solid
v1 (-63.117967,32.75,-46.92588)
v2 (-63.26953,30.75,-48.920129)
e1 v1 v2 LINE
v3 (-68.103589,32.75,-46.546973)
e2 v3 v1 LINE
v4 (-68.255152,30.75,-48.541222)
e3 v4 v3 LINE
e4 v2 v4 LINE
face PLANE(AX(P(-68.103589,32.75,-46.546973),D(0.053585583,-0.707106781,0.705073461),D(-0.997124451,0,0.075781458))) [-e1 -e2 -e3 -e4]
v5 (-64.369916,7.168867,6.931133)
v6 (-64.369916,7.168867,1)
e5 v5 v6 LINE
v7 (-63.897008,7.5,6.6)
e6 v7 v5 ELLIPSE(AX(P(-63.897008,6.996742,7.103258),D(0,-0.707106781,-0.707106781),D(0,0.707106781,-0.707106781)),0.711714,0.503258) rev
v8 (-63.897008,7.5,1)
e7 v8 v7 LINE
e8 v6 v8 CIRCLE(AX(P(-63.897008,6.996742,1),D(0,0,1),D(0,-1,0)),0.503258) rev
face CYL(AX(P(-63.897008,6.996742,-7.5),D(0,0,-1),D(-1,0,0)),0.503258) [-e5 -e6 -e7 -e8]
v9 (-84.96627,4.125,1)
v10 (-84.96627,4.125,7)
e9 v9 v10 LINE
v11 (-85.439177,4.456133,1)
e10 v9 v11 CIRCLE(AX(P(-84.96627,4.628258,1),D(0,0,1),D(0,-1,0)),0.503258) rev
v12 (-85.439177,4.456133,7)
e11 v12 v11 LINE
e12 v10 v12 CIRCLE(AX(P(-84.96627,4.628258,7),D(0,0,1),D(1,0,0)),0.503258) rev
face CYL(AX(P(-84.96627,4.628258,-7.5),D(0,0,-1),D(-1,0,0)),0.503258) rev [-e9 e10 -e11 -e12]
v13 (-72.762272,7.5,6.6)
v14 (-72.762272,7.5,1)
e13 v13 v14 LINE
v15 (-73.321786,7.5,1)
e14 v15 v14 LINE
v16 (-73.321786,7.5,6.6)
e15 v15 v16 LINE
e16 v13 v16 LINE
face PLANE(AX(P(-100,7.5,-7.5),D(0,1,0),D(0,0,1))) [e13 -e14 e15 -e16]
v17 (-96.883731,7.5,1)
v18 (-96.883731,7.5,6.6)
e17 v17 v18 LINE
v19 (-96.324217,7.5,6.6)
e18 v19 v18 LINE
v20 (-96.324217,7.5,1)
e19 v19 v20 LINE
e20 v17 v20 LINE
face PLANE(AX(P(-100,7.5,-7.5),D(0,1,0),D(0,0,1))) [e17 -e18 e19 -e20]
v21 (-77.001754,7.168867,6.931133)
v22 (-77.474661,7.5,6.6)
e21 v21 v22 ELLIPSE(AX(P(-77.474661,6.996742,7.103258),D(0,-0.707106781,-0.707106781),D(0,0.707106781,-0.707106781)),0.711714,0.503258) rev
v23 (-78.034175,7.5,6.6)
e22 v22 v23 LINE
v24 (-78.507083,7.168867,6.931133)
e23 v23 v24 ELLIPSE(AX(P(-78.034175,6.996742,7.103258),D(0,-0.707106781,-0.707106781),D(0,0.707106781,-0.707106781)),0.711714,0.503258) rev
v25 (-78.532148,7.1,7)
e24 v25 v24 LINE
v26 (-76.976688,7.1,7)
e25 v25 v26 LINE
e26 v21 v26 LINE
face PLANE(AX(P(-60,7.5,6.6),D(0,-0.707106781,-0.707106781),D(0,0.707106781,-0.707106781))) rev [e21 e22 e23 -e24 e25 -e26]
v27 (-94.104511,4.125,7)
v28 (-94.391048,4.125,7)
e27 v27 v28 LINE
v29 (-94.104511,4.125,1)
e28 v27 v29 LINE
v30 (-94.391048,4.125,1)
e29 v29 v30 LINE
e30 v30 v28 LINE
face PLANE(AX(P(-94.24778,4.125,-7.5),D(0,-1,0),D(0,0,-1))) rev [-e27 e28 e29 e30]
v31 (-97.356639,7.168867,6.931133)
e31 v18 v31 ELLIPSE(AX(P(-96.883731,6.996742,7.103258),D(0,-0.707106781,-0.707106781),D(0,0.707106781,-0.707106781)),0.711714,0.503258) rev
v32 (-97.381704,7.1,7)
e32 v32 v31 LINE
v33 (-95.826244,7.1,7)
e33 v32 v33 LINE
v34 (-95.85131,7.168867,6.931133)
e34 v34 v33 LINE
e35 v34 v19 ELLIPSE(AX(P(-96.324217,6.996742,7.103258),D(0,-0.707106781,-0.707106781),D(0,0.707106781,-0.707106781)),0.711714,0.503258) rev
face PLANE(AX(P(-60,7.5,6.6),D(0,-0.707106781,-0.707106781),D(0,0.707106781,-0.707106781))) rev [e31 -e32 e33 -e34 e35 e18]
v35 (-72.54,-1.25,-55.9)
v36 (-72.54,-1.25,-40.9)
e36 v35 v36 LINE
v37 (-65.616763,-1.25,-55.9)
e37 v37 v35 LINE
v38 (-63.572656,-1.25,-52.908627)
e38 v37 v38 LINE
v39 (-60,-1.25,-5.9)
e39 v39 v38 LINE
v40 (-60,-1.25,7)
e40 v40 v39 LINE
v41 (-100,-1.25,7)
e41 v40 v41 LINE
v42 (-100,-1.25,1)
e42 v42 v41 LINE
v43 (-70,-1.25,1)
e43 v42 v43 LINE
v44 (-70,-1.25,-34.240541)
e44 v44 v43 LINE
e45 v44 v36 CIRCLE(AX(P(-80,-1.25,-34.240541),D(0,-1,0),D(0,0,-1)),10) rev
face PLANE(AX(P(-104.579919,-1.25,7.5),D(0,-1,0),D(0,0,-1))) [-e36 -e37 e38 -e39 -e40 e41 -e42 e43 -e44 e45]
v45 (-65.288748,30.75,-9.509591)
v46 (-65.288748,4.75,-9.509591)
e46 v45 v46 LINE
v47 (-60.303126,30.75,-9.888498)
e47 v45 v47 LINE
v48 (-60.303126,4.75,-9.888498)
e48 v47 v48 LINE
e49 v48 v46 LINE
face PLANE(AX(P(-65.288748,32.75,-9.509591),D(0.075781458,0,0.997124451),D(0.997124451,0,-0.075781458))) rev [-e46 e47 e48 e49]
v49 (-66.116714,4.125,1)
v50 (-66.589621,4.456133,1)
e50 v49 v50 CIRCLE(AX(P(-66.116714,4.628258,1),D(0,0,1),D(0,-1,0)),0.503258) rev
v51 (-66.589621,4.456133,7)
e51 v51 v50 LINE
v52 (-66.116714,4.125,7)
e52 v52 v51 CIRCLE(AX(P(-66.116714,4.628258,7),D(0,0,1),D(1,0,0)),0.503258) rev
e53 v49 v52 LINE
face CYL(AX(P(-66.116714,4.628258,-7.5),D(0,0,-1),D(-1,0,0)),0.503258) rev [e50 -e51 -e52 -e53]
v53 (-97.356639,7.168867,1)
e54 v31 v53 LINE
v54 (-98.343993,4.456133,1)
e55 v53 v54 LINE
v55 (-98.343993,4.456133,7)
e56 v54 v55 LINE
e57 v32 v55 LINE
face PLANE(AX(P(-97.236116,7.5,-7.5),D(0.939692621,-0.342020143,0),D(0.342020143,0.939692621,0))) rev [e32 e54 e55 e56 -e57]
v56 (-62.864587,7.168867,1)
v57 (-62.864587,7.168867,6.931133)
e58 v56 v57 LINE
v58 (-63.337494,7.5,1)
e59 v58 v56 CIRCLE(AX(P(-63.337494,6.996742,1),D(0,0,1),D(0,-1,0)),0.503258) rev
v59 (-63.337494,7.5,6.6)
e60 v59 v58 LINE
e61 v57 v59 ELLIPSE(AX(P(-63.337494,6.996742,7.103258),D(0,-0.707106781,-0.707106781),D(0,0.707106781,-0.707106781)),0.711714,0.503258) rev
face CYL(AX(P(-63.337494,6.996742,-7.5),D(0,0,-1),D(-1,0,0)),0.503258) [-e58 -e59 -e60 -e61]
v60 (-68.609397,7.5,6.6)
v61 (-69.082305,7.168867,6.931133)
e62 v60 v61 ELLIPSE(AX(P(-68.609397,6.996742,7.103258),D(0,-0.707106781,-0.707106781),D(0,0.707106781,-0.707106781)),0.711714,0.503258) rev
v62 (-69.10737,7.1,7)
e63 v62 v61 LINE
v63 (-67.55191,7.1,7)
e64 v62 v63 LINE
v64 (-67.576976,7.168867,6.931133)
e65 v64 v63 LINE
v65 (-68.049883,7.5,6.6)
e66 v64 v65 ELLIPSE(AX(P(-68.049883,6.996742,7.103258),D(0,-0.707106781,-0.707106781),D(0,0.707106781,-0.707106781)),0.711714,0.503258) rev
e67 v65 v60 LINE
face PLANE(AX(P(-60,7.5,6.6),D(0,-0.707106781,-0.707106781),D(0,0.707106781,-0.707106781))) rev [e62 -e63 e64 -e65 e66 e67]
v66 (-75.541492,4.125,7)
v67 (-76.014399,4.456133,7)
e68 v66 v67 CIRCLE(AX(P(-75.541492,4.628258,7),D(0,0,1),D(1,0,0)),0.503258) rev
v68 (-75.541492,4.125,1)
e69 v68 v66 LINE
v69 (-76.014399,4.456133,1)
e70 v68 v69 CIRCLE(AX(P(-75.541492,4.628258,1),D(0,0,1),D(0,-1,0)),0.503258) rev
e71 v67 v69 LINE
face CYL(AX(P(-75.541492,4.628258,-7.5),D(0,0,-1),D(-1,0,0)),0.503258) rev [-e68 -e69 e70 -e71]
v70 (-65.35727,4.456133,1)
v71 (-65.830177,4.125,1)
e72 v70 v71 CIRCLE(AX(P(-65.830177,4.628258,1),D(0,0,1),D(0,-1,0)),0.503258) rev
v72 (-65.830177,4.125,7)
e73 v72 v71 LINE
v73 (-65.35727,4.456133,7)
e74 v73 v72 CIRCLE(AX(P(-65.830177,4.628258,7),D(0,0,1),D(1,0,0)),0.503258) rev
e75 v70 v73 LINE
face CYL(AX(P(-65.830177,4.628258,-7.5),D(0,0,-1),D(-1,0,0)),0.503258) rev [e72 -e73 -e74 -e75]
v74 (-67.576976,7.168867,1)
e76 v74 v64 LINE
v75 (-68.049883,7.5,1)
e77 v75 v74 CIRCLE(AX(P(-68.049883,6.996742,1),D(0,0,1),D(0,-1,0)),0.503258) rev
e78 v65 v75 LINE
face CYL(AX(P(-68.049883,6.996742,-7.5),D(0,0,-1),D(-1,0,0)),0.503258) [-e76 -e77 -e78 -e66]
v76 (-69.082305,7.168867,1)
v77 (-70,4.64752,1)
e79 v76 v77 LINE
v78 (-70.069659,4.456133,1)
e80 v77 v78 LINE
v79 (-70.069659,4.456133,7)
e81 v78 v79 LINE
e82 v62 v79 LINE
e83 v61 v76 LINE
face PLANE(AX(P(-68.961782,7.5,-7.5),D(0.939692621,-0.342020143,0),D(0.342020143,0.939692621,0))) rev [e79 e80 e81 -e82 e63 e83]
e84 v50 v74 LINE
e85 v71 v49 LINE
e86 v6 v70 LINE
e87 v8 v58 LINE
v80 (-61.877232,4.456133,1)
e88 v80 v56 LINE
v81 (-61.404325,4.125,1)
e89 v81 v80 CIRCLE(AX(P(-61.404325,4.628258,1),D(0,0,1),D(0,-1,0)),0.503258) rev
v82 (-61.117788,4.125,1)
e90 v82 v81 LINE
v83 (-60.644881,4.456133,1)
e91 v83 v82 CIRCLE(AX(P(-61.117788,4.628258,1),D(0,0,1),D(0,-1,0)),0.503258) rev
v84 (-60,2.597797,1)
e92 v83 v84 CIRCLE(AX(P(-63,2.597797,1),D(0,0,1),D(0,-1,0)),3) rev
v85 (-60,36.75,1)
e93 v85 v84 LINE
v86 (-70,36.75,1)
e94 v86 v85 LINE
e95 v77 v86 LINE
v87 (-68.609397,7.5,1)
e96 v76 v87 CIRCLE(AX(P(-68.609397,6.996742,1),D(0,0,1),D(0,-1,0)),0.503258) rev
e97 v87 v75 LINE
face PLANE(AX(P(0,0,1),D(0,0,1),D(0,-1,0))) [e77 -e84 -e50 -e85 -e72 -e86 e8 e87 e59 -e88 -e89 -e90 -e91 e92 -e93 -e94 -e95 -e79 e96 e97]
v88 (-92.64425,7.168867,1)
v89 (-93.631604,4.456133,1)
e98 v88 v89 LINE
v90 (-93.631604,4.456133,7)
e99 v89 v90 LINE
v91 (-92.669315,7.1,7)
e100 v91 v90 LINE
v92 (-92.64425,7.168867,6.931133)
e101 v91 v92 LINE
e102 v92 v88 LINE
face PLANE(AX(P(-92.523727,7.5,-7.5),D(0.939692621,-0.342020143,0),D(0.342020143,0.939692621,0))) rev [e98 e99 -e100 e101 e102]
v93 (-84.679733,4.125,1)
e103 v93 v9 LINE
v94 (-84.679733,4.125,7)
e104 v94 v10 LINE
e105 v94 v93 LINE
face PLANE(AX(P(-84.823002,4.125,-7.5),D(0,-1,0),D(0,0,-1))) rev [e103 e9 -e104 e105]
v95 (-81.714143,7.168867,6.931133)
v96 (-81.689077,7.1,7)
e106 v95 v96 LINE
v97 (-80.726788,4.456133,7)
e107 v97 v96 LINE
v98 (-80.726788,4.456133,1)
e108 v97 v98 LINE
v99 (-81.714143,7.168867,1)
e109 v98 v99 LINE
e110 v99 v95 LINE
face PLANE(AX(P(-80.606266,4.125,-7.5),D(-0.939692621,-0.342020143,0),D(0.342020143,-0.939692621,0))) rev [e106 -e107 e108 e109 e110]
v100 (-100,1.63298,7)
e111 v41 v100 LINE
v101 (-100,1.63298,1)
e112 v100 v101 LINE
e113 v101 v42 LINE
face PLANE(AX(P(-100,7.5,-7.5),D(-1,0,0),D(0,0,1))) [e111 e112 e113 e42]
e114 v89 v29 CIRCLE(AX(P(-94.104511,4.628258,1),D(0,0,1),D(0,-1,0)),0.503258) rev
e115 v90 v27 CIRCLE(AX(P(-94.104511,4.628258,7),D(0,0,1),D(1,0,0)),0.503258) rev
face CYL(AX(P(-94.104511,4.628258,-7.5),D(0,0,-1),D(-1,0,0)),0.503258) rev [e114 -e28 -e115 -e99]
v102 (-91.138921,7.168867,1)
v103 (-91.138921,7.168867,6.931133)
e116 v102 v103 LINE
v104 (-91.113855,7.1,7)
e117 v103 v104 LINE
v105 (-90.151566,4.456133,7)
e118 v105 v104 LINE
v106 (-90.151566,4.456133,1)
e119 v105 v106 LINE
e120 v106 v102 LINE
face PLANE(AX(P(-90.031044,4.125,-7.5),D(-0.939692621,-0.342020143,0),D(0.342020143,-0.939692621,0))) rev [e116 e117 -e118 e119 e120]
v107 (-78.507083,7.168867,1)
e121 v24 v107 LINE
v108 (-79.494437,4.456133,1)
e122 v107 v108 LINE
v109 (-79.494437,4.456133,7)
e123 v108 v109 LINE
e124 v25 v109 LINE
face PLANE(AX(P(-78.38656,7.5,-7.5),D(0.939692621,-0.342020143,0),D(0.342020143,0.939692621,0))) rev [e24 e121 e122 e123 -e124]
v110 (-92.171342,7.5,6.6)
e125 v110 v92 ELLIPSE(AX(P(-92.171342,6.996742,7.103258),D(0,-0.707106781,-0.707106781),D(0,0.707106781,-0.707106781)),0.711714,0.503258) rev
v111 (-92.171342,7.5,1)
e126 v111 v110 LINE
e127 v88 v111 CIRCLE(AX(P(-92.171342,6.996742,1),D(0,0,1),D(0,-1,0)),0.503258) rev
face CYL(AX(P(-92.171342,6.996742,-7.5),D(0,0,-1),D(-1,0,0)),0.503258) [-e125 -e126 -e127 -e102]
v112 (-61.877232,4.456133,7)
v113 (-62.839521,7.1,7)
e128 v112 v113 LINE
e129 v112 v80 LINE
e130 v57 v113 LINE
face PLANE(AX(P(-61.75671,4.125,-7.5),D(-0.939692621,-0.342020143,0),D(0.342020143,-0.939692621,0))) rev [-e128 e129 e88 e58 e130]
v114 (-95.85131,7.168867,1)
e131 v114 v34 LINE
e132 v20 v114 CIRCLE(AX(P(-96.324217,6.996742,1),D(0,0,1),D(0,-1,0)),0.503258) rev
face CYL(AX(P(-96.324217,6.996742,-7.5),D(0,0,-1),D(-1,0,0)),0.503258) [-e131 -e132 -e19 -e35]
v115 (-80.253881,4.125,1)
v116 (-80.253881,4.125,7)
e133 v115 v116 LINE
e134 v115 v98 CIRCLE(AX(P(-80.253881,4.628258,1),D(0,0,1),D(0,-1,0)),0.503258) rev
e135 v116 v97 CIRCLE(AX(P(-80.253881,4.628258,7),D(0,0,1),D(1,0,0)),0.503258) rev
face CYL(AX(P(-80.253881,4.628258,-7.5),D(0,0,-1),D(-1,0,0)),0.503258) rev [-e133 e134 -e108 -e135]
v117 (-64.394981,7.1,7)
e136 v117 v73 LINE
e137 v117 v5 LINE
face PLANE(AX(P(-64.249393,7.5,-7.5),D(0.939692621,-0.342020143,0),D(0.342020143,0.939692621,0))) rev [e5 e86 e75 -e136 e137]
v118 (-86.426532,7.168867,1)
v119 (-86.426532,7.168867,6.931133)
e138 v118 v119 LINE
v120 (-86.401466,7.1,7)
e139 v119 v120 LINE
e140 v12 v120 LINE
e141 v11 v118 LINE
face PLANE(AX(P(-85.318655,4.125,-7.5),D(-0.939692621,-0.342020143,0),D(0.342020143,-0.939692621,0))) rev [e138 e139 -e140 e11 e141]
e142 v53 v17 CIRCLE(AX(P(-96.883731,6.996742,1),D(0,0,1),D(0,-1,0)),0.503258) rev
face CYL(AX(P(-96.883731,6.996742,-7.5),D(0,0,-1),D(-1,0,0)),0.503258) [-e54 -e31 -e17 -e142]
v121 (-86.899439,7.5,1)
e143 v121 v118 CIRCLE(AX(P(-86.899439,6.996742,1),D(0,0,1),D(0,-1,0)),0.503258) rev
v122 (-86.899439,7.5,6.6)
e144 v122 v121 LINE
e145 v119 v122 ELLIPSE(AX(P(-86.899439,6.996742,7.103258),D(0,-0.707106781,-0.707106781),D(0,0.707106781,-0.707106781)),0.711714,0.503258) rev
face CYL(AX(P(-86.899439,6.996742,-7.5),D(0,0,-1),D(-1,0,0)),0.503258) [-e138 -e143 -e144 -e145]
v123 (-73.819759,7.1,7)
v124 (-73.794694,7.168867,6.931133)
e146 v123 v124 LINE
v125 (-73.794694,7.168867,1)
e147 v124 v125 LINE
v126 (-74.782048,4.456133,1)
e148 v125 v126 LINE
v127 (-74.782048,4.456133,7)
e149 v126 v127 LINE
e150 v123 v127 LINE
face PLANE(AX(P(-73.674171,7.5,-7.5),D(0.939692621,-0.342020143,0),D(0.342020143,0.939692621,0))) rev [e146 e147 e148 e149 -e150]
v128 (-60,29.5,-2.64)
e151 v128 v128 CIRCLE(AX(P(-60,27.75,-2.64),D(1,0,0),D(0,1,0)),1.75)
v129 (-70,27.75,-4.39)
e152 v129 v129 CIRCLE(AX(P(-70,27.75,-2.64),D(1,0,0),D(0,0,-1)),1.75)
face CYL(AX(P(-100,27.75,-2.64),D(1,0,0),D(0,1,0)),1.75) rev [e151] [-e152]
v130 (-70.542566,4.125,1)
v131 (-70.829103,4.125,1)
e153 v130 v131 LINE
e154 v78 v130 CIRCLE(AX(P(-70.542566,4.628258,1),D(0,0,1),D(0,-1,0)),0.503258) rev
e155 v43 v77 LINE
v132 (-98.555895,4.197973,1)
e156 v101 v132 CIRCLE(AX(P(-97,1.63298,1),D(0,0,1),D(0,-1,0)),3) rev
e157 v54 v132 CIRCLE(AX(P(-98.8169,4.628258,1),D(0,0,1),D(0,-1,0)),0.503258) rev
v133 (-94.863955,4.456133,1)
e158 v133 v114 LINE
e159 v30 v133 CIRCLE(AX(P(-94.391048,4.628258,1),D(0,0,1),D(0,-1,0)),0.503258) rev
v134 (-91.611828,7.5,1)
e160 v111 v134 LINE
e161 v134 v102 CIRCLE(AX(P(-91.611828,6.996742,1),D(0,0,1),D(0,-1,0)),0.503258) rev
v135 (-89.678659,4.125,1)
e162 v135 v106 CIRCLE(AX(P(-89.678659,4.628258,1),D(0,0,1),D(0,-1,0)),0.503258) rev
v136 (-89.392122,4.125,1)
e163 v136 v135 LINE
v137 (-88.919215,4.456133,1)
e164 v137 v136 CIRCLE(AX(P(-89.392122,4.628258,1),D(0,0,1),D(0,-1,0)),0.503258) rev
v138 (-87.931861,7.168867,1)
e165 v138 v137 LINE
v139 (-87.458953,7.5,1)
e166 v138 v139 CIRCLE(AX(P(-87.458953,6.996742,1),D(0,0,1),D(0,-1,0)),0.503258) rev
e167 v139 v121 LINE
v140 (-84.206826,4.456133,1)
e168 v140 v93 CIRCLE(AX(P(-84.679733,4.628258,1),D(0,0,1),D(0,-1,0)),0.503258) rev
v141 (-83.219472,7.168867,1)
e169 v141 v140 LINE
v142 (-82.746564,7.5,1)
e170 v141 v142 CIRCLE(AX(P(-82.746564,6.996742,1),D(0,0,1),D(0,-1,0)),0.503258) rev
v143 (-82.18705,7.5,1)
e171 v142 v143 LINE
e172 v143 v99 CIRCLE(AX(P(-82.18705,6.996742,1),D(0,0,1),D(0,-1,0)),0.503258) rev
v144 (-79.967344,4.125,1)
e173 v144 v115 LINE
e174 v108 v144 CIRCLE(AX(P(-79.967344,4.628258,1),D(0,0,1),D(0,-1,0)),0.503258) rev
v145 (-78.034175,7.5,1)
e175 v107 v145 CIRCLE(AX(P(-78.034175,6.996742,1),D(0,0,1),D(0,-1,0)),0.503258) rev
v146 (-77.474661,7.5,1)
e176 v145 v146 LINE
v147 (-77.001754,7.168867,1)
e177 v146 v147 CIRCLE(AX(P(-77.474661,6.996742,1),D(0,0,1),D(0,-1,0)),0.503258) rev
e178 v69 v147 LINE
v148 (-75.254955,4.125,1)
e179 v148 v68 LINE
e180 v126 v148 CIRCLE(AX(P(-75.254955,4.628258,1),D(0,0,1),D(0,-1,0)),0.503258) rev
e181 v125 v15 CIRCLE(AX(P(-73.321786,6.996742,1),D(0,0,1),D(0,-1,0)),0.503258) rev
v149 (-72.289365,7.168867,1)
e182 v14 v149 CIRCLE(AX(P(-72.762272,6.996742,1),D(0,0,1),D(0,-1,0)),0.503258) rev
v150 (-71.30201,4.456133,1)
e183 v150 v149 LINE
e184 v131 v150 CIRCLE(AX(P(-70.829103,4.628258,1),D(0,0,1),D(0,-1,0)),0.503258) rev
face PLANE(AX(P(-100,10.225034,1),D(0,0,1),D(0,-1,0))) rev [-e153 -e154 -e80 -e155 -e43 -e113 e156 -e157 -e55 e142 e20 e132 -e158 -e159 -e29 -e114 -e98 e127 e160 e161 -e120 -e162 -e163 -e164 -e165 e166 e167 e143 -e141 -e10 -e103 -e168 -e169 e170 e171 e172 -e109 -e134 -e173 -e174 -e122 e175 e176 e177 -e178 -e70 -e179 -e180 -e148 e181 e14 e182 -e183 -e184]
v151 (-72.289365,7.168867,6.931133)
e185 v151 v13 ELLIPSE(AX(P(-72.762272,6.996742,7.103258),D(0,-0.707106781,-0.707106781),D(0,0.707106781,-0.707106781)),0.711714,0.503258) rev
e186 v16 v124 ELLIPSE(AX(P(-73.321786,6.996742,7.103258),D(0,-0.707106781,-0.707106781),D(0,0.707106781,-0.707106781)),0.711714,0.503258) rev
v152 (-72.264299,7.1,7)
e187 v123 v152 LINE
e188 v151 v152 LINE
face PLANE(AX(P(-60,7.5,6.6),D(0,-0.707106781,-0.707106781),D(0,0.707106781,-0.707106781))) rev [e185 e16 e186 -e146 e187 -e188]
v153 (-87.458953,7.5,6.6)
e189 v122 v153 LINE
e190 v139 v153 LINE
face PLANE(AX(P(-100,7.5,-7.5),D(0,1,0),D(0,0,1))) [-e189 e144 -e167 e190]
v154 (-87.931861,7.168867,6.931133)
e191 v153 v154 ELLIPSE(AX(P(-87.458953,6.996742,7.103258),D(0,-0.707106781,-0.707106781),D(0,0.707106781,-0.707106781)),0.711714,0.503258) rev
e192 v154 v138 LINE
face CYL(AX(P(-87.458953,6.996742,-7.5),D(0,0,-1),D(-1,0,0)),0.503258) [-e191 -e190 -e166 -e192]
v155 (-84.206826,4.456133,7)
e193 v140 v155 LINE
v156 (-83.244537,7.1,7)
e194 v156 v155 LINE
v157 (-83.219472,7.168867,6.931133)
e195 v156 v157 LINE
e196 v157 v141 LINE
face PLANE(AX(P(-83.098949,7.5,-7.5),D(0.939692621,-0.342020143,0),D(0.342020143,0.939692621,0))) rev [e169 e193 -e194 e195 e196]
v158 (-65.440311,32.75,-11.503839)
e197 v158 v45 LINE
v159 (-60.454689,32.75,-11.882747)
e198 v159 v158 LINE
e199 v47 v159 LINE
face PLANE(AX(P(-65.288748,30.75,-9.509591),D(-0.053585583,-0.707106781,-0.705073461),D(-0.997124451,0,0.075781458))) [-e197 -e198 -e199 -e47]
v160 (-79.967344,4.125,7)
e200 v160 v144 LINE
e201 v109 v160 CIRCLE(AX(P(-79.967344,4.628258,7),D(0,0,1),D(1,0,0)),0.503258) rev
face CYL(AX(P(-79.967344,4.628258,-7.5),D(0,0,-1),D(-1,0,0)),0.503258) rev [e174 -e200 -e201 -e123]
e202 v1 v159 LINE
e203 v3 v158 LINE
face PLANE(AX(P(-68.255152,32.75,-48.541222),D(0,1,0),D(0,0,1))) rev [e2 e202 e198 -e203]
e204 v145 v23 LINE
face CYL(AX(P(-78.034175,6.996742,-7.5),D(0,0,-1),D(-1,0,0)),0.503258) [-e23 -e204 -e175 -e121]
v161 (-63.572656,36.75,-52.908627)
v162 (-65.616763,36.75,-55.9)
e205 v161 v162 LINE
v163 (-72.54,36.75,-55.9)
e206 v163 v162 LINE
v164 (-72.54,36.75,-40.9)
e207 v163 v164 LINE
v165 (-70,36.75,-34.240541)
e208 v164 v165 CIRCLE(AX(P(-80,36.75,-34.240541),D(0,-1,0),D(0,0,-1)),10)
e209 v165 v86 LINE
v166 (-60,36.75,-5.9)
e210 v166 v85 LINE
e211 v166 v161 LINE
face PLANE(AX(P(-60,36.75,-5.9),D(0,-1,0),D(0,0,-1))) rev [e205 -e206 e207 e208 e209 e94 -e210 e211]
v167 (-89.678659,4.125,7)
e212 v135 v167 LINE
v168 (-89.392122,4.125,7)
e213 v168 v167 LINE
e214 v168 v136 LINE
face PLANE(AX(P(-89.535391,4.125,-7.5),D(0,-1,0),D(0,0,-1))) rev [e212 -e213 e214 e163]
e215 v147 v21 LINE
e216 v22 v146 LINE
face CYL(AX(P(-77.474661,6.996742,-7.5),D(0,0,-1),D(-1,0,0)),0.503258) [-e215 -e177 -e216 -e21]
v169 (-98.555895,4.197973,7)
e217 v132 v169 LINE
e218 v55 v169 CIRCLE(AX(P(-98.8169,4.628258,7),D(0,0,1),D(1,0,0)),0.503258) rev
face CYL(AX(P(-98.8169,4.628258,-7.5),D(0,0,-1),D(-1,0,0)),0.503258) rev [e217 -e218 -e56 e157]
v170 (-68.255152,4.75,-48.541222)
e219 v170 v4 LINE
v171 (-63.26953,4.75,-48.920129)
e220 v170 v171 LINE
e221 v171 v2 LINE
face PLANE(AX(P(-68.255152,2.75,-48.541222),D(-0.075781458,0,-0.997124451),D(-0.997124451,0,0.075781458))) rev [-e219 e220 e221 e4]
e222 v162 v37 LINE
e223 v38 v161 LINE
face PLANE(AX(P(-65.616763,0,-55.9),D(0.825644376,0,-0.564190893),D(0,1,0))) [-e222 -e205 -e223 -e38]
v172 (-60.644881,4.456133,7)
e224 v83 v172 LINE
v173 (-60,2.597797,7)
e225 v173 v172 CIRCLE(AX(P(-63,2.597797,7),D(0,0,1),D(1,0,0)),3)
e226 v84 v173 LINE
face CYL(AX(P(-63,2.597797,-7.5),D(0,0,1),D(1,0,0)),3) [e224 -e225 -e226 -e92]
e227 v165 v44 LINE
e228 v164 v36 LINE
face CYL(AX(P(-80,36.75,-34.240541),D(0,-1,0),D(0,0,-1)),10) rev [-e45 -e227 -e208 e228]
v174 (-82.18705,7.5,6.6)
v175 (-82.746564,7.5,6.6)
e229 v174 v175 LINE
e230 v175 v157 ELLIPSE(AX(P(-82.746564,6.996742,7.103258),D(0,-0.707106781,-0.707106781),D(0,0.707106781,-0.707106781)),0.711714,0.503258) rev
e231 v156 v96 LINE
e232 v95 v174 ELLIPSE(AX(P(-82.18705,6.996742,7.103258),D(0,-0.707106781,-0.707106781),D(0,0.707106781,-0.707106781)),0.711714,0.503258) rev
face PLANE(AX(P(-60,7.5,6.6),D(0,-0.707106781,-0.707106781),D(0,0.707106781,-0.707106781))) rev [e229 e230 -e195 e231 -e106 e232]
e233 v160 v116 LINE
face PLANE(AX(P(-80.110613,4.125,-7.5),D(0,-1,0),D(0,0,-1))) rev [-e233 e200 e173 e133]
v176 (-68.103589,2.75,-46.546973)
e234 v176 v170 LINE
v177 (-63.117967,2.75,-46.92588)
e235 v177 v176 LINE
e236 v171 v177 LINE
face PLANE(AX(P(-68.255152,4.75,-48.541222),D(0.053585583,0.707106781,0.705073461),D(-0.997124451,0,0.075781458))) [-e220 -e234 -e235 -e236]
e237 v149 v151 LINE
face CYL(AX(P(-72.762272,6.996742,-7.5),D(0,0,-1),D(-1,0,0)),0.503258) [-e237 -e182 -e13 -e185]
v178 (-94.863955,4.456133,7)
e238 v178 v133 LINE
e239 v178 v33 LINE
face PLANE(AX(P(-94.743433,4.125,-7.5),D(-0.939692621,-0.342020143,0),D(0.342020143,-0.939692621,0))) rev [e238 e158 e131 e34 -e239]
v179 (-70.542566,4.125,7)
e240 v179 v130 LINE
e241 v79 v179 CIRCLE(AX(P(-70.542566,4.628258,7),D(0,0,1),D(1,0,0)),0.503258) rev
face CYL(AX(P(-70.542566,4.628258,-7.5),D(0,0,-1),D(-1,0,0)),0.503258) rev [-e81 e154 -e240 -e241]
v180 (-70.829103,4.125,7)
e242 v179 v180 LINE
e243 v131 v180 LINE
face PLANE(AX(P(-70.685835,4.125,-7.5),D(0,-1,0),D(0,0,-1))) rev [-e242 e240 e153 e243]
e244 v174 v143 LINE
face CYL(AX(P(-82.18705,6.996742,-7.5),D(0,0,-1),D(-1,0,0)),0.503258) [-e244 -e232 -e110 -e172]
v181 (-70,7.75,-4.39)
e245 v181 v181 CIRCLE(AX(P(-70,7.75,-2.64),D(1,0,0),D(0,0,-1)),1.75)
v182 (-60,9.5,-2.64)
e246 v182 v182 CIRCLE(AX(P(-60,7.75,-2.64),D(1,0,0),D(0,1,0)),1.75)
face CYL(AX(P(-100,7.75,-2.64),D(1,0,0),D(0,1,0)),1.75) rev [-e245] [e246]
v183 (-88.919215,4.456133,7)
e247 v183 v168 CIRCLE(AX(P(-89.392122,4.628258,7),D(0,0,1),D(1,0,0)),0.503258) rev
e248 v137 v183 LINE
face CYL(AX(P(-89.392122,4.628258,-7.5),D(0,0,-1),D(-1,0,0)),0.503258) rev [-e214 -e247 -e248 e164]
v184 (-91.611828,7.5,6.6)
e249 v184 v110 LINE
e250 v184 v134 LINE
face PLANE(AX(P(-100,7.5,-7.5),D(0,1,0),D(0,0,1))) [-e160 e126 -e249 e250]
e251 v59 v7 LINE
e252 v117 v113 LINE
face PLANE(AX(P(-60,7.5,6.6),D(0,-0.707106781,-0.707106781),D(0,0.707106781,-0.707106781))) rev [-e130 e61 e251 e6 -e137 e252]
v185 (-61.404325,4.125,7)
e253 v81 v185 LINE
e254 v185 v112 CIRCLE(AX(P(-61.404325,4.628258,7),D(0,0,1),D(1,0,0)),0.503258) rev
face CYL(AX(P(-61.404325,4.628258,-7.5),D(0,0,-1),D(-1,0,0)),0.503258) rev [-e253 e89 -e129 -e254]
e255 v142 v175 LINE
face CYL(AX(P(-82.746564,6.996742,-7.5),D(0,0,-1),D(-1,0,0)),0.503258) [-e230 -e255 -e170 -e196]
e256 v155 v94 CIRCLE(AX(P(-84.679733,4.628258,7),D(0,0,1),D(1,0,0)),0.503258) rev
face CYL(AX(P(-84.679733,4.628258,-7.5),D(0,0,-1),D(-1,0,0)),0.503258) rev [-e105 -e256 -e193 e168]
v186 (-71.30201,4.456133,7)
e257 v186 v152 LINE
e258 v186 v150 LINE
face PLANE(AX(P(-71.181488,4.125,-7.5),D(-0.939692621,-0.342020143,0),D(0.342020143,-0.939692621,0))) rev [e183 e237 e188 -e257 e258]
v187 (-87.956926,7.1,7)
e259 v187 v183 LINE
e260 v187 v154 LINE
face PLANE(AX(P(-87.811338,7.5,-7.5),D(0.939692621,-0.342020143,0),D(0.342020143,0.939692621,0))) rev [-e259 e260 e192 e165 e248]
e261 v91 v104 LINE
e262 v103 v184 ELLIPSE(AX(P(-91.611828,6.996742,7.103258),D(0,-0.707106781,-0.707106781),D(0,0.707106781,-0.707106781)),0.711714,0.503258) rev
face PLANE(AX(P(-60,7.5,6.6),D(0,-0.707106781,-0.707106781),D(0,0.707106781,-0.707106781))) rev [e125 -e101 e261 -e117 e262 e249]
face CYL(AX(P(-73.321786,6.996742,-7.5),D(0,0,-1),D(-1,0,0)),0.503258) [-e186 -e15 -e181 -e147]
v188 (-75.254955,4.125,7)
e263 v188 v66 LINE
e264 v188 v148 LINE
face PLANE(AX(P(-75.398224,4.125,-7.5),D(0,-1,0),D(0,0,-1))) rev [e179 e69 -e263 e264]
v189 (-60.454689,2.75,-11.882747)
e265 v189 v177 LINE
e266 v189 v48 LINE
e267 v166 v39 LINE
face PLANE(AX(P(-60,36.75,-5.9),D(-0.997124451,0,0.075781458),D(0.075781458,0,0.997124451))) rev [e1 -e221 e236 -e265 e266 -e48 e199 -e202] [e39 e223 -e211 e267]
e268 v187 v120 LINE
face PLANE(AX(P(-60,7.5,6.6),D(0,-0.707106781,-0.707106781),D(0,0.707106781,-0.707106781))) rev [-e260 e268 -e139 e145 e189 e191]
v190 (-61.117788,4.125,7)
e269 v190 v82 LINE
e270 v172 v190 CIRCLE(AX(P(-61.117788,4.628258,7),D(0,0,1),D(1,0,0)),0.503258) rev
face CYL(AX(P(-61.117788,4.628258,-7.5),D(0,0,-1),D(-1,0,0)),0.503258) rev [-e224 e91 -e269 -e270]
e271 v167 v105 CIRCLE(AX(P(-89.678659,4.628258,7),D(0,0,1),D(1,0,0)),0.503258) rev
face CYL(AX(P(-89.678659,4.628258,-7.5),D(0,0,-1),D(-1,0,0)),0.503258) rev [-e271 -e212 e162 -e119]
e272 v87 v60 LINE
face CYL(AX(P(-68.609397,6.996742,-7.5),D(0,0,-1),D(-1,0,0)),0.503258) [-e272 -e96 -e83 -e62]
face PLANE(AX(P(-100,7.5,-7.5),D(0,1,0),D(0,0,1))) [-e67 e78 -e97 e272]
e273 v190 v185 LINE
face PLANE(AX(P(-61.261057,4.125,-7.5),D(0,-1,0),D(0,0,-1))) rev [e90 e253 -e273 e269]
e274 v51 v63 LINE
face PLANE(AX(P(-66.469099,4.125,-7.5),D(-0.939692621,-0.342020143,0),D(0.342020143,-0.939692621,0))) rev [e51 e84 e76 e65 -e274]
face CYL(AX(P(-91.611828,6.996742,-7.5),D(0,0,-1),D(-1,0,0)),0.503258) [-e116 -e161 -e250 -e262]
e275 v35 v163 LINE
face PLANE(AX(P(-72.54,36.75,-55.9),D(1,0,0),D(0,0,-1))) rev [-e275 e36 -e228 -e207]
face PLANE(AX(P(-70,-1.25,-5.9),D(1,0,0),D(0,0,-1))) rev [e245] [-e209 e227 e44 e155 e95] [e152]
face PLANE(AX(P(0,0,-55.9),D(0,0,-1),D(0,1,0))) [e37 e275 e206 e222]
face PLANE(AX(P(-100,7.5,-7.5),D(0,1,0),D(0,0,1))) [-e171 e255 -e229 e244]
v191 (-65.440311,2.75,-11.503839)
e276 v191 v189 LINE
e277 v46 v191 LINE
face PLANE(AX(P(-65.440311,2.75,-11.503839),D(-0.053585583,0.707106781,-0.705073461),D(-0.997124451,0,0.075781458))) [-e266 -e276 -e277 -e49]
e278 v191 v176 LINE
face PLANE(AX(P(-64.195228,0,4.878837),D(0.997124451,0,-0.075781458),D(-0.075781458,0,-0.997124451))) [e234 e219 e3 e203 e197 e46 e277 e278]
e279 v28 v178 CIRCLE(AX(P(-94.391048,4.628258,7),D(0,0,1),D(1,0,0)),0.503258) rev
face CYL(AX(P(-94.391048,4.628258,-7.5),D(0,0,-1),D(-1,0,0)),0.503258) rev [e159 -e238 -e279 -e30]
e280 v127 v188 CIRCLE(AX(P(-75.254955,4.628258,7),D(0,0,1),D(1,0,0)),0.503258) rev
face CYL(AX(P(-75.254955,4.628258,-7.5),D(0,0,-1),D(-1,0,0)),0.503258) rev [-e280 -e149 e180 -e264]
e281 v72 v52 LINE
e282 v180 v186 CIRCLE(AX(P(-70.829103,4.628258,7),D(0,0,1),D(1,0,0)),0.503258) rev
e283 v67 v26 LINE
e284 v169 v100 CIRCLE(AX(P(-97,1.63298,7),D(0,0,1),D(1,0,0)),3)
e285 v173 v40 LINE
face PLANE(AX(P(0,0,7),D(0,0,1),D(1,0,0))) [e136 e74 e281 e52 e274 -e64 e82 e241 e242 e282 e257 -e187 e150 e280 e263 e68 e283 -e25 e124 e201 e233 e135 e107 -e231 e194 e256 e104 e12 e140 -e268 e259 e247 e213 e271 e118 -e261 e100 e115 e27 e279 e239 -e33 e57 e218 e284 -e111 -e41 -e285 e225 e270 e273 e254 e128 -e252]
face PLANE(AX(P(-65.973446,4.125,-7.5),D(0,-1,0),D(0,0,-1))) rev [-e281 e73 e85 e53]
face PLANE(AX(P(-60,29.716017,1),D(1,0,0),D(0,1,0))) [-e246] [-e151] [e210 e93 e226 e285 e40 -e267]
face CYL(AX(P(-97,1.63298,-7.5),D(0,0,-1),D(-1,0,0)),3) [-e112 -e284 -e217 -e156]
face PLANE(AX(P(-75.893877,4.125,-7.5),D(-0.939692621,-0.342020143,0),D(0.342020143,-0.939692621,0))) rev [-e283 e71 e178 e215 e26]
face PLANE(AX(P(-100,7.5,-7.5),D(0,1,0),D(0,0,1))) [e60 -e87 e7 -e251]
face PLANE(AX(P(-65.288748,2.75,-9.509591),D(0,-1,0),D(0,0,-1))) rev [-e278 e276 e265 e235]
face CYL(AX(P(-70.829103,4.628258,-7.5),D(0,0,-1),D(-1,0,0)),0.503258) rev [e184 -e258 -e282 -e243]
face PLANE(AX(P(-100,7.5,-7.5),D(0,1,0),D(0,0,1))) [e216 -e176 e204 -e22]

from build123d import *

# Parameters (mm, degrees)
BOSS_EXTRUDE1_DEPTH      = 7.5
BOSS_EXTRUDE1_DEPTH_BACK = 7.5
SKETCH3_W                = 200
SKETCH3_H                = 15
CUT_EXTRUDE1_DEPTH       = 101.560926806
FILLET1_R                = 0.503257554
LPATTERN1_COUNT          = 42
LPATTERN1_PITCH          = 4.71238898
FILLET1_OF_LPATTERN1_R   = 0.503257554
CUT_EXTRUDE2_DEPTH       = 101.560926806
CUT_EXTRUDE2_DEPTH_BACK  = 101.560926806
SKETCH5_W                = 4.71238898
SKETCH5_H                = 3.375
CUT_EXTRUDE3_DEPTH       = 101.560926806
CUT_EXTRUDE3_DEPTH_BACK  = 101.560926806
SKETCH6_W                = 13.890612777
SKETCH6_H                = 21.950597968
CUT_EXTRUDE6_DEPTH       = 101.560926806
CUT_EXTRUDE6_DEPTH_BACK  = 101.560926806
SKETCH8_W                = 175.100830171
SKETCH8_H                = 44.946806771
SKETCH9_W                = 55.501850732
SKETCH9_H                = 10.784038355
CUT_EXTRUDE7_DEPTH       = 101.560926806
SKETCH10_W               = 10
SKETCH10_H               = 38
BOSS_EXTRUDE2_DEPTH      = 6.9
SKETCH11_W               = 12.54
SKETCH11_H               = 38
BOSS_EXTRUDE3_DEPTH      = 50
SKETCH12_W               = 2.54
SKETCH12_H               = 35
CUT_EXTRUDE8_DEPTH       = 121.701325593
CHAMFER1_SIZE            = 3
CHAMFER1_SIZE2           = 1.816762814
FILLET2_R                = 10
SKETCH13_W               = 39.144192087
SKETCH13_H               = 30
CUT_EXTRUDE9_DEPTH       = 5
CHAMFER2_SIZE            = 2
SKETCH14_R               = 1.75
CUT_EXTRUDE10_DEPTH      = 78.944675893
SKETCH15_W               = 75.463673411
SKETCH15_H               = 29.481435093
CUT_EXTRUDE11_DEPTH      = 0.5
FILLET3_R                = 3
CUT_EXTRUDE12_DEPTH      = 78.944675893
CUT_EXTRUDE12_DEPTH_BACK = 78.944675893


with BuildPart() as part:
    # Sketch3 → Boss-Extrude1 (new, two sides: drawn at the far end of the back side and taken through both)
    with BuildSketch(Plane.XY.offset(-BOSS_EXTRUDE1_DEPTH_BACK)):
        Rectangle(SKETCH3_W, SKETCH3_H)
    extrude(amount=BOSS_EXTRUDE1_DEPTH + BOSS_EXTRUDE1_DEPTH_BACK)

    # Sketch4 → Cut-Extrude1 (cut, symmetric)
    with BuildSketch(Plane.XY):
        Polygon((-94.247779608, 7.5), (-94.247779608, 4.125), (-94.743432664, 4.125), (-95.971832204, 7.5), align=None)
        Polygon((-97.236115992, 7.5), (-98.464515532, 4.125), (-98.960168588, 4.125), (-98.960168588, 7.5), align=None)
    cut_extrude1 = extrude(amount=CUT_EXTRUDE1_DEPTH, both=True, mode=Mode.SUBTRACT)

    # Fillet1
    fillet1_edges = [part.edges().sort_by_distance(p)[0] for p in [
        (-95.971832204, 7.5, 0),
        (-94.743432664, 4.125, 0),
        (-97.236115992, 7.5, 0),
        (-98.464515532, 4.125, 0),
    ]]
    fillet(fillet1_edges, radius=FILLET1_R)

    # LPattern1: Cut-Extrude1 ×42
    with Locations(*[(i * LPATTERN1_PITCH, 0, 0) for i in range(1, LPATTERN1_COUNT)]):
        add(cut_extrude1, mode=Mode.SUBTRACT)

    # Fillet1 of LPattern1
    fillet1_of_lpattern1_edges = [part.edges().sort_by_distance(p)[0] for p in [
        (-91.259443224, 7.5, 0),
        (-90.031043683, 4.125, 0),
        (-92.523727011, 7.5, 0),
        (-93.752126552, 4.125, 0),
        (-86.547054243, 7.5, 0),
        (-85.318654703, 4.125, 0),
        (-87.811338031, 7.5, 0),
        (-89.039737571, 4.125, 0),
        (-81.834665263, 7.5, 0),
        (-80.606265722, 4.125, 0),
        (-83.09894905, 7.5, 0),
        (-84.327348591, 4.125, 0),
        (-77.122276283, 7.5, 0),
        (-75.893876742, 4.125, 0),
        (-78.38656007, 7.5, 0),
        (-79.614959611, 4.125, 0),
        (-72.409887302, 7.5, 0),
        (-71.181487762, 4.125, 0),
        (-73.67417109, 7.5, 0),
        (-74.90257063, 4.125, 0),
        (-67.697498322, 7.5, 0),
        (-66.469098781, 4.125, 0),
        (-68.961782109, 7.5, 0),
        (-70.19018165, 4.125, 0),
        (-62.985109342, 7.5, 0),
        (-61.756709801, 4.125, 0),
        (-64.249393129, 7.5, 0),
        (-65.47779267, 4.125, 0),
        (-58.272720361, 7.5, 0),
        (-57.04432082, 4.125, 0),
        (-59.537004149, 7.5, 0),
        (-60.765403689, 4.125, 0),
        (-53.560331381, 7.5, 0),
        (-52.33193184, 4.125, 0),
        (-54.824615168, 7.5, 0),
        (-56.053014709, 4.125, 0),
        (-48.8479424, 7.5, 0),
        (-47.61954286, 4.125, 0),
        (-50.112226188, 7.5, 0),
        (-51.340625728, 4.125, 0),
        (-44.13555342, 7.5, 0),
        (-42.907153879, 4.125, 0),
        (-45.399837207, 7.5, 0),
        (-46.628236748, 4.125, 0),
        (-39.42316444, 7.5, 0),
        (-38.194764899, 4.125, 0),
        (-40.687448227, 7.5, 0),
        (-41.915847768, 4.125, 0),
        (-34.710775459, 7.5, 0),
        (-33.482375919, 4.125, 0),
        (-35.975059247, 7.5, 0),
        (-37.203458787, 4.125, 0),
        (-29.998386479, 7.5, 0),
        (-28.769986938, 4.125, 0),
        (-31.262670266, 7.5, 0),
        (-32.491069807, 4.125, 0),
        (-25.285997498, 7.5, 0),
        (-24.057597958, 4.125, 0),
        (-26.550281286, 7.5, 0),
        (-27.778680826, 4.125, 0),
        (-20.573608518, 7.5, 0),
        (-19.345208977, 4.125, 0),
        (-21.837892305, 7.5, 0),
        (-23.066291846, 4.125, 0),
        (-15.861219538, 7.5, 0),
        (-14.632819997, 4.125, 0),
        (-17.125503325, 7.5, 0),
        (-18.353902866, 4.125, 0),
        (-11.148830557, 7.5, 0),
        (-9.920431017, 4.125, 0),
        (-12.413114345, 7.5, 0),
        (-13.641513885, 4.125, 0),
        (-6.436441577, 7.5, 0),
        (-5.208042036, 4.125, 0),
        (-7.700725364, 7.5, 0),
        (-8.929124905, 4.125, 0),
        (-1.724052597, 7.5, 0),
        (-0.495653056, 4.125, 0),
        (-2.988336384, 7.5, 0),
        (-4.216735925, 4.125, 0),
        (2.988336384, 7.5, 0),
        (4.216735925, 4.125, 0),
        (1.724052596, 7.5, 0),
        (0.495653056, 4.125, 0),
        (7.700725364, 7.5, 0),
        (8.929124905, 4.125, 0),
        (6.436441577, 7.5, 0),
        (5.208042036, 4.125, 0),
        (12.413114345, 7.5, 0),
        (13.641513885, 4.125, 0),
        (11.148830557, 7.5, 0),
        (9.920431017, 4.125, 0),
        (17.125503325, 7.5, 0),
        (18.353902866, 4.125, 0),
        (15.861219538, 7.5, 0),
        (14.632819997, 4.125, 0),
        (21.837892305, 7.5, 0),
        (23.066291846, 4.125, 0),
        (20.573608518, 7.5, 0),
        (19.345208977, 4.125, 0),
        (26.550281286, 7.5, 0),
        (27.778680826, 4.125, 0),
        (25.285997498, 7.5, 0),
        (24.057597958, 4.125, 0),
        (31.262670266, 7.5, 0),
        (32.491069807, 4.125, 0),
        (29.998386479, 7.5, 0),
        (28.769986938, 4.125, 0),
        (35.975059247, 7.5, 0),
        (37.203458787, 4.125, 0),
        (34.710775459, 7.5, 0),
        (33.482375919, 4.125, 0),
        (40.687448227, 7.5, 0),
        (41.915847768, 4.125, 0),
        (39.42316444, 7.5, 0),
        (38.194764899, 4.125, 0),
        (45.399837207, 7.5, 0),
        (46.628236748, 4.125, 0),
        (44.13555342, 7.5, 0),
        (42.907153879, 4.125, 0),
        (50.112226188, 7.5, 0),
        (51.340625728, 4.125, 0),
        (48.8479424, 7.5, 0),
        (47.61954286, 4.125, 0),
        (54.824615168, 7.5, 0),
        (56.053014709, 4.125, 0),
        (53.560331381, 7.5, 0),
        (52.33193184, 4.125, 0),
        (59.537004148, 7.5, 0),
        (60.765403689, 4.125, 0),
        (58.272720361, 7.5, 0),
        (57.04432082, 4.125, 0),
        (64.249393129, 7.5, 0),
        (65.47779267, 4.125, 0),
        (62.985109341, 7.5, 0),
        (61.756709801, 4.125, 0),
        (68.961782109, 7.5, 0),
        (70.19018165, 4.125, 0),
        (67.697498322, 7.5, 0),
        (66.469098781, 4.125, 0),
        (73.67417109, 7.5, 0),
        (74.90257063, 4.125, 0),
        (72.409887302, 7.5, 0),
        (71.181487762, 4.125, 0),
        (78.38656007, 7.5, 0),
        (79.614959611, 4.125, 0),
        (77.122276283, 7.5, 0),
        (75.893876742, 4.125, 0),
        (83.09894905, 7.5, 0),
        (84.327348591, 4.125, 0),
        (81.834665263, 7.5, 0),
        (80.606265722, 4.125, 0),
        (87.811338031, 7.5, 0),
        (89.039737571, 4.125, 0),
        (86.547054243, 7.5, 0),
        (85.318654703, 4.125, 0),
        (92.523727011, 7.5, 0),
        (93.752126552, 4.125, 0),
        (91.259443224, 7.5, 0),
        (90.031043683, 4.125, 0),
        (97.236115992, 7.5, 0),
        (98.464515532, 4.125, 0),
        (95.971832204, 7.5, 0),
        (94.743432664, 4.125, 0),
    ]]
    fillet(fillet1_of_lpattern1_edges, radius=FILLET1_OF_LPATTERN1_R)

    # Sketch5 → Cut-Extrude2 (cut, two sides: drawn at the far end of the back side and taken through both)
    with BuildSketch(Plane.XY.offset(-CUT_EXTRUDE2_DEPTH_BACK)):
        with Locations((-101.316363078, 5.8125)):
            Rectangle(SKETCH5_W, SKETCH5_H)
        with Locations((101.316363078, 5.8125)):
            Rectangle(SKETCH5_W, SKETCH5_H)
    extrude(amount=CUT_EXTRUDE2_DEPTH + CUT_EXTRUDE2_DEPTH_BACK, mode=Mode.SUBTRACT)

    # Sketch6 → Cut-Extrude3 (cut, two sides: drawn at the far end of the back side and taken through both)
    with BuildSketch(Plane(origin=(0, 0, 0), x_dir=(0, 0, -1), z_dir=(1, 0, 0)).offset(-CUT_EXTRUDE3_DEPTH_BACK)):
        with Locations((5.945306389, -0.750264579)):
            Rectangle(SKETCH6_W, SKETCH6_H)
    extrude(amount=CUT_EXTRUDE3_DEPTH + CUT_EXTRUDE3_DEPTH_BACK, mode=Mode.SUBTRACT)

    # Sketch8 → Cut-Extrude6 (cut, two sides: drawn at the far end of the back side and taken through both)
    with BuildSketch(Plane.XY.offset(-CUT_EXTRUDE6_DEPTH_BACK)):
        with Locations((27.550415086, 7.242613414)):
            Rectangle(SKETCH8_W, SKETCH8_H)
    extrude(amount=CUT_EXTRUDE6_DEPTH + CUT_EXTRUDE6_DEPTH_BACK, mode=Mode.SUBTRACT)

    # Sketch9 → Cut-Extrude7 (cut, through all)
    with BuildSketch(Plane.XY):
        with Locations((-76.828993169, -6.642019178)):
            Rectangle(SKETCH9_W, SKETCH9_H)
    extrude(amount=CUT_EXTRUDE7_DEPTH, mode=Mode.SUBTRACT)

    # Sketch10 → Boss-Extrude2 (add)
    with BuildSketch(Plane(origin=(0, 0, 1), x_dir=(-1, 0, 0), z_dir=(0, 0, -1))):
        with Locations((65, 17.75)):
            Rectangle(SKETCH10_W, SKETCH10_H)
    extrude(amount=BOSS_EXTRUDE2_DEPTH)

    # Sketch11 → Boss-Extrude3 (add)
    with BuildSketch(Plane(origin=(0, 0, -5.9), x_dir=(-1, 0, 0), z_dir=(0, 0, -1))):
        with Locations((66.27, 17.75)):
            Rectangle(SKETCH11_W, SKETCH11_H)
    extrude(amount=BOSS_EXTRUDE3_DEPTH)

    # Sketch12 → Cut-Extrude8 (cut, through all)
    with BuildSketch(Plane.XZ.offset(1.25)):
        with Locations((-71.27, -23.4)):
            Rectangle(SKETCH12_W, SKETCH12_H)
        Polygon((-60, -5.9), (-63.8, -55.9), (-60, -55.9), align=None)
    extrude(amount=-CUT_EXTRUDE8_DEPTH, mode=Mode.SUBTRACT)

    # Chamfer1
    chamfer1_edges = [part.edges().sort_by_distance(p)[0] for p in [
        (-63.8, 17.75, -55.9),
    ]]
    chamfer1_side = [part.faces().sort_by_distance(p)[0] for p in [
        (-61.9, 17.75, -30.9),
    ]]
    chamfer(chamfer1_edges, length=CHAMFER1_SIZE, length2=CHAMFER1_SIZE2, reference=chamfer1_side[0])

    # Fillet2
    # the kernel refuses this fillet: 10 mm, written as the material it adds along each edge
    with BuildSketch(Plane(origin=(-70, -1.25, -40.9), x_dir=(-1, 0, 0), z_dir=(0, 1, 0))) as fillet2_piece_1:
        with BuildLine():
            CenterArc((10, 6.659459438), FILLET2_R, 180, 41.754936598)
            Line((0, 6.659459438), (-0.2, 6.659459438))
            Line((-0.2, 6.659459438), (-0.2, 0))
            Line((-0.2, 0), (0, -0.2))
            ThreePointArc((0, -0.2), (1.27, -0.2), (2.3908, -0.133189189))
            Line((2.3908, -0.133189189), (2.54, 0))
        make_face()
    extrude(amount=38)

    # Sketch13 → Cut-Extrude9 (cut)
    with BuildSketch(Plane(origin=(-59.20960532, 0, 4.499930004), x_dir=(-0.07578145826840343, 0, -0.997124450900044), z_dir=(0.997124450900044, 0, -0.07578145826840343))):
        with Locations((34.0020178, 17.75)):
            Rectangle(SKETCH13_W, SKETCH13_H)
    extrude(amount=-CUT_EXTRUDE9_DEPTH, mode=Mode.SUBTRACT)

    # Chamfer2
    chamfer2_edges = [part.edges().sort_by_distance(p)[0] for p in [
        (-62.79593696, 2.75, -9.699044158),
        (-62.79593696, 32.75, -9.699044158),
        (-65.762340919, 32.75, -48.730675198),
        (-65.762340919, 2.75, -48.730675198),
    ]]
    chamfer(chamfer2_edges, length=CHAMFER2_SIZE)

    # Sketch14 → Cut-Extrude10 (cut, through all)
    with BuildSketch(Plane(origin=(-60, 0, 0), x_dir=(0, 0, -1), z_dir=(1, 0, 0))):
        with Locations(Location((2.64, 27.75, 0), (0, 0, 90))):
            Circle(SKETCH14_R)
        with Locations(Location((2.64, 7.75, 0), (0, 0, 90))):
            Circle(SKETCH14_R)
    extrude(amount=-CUT_EXTRUDE10_DEPTH, mode=Mode.SUBTRACT)

    # Sketch15 → Cut-Extrude11 (cut)
    with BuildSketch(Plane.XY.offset(7.5)):
        with Locations((-71.80980664, 4.677610669)):
            Rectangle(SKETCH15_W, SKETCH15_H)
    extrude(amount=-CUT_EXTRUDE11_DEPTH, mode=Mode.SUBTRACT)

    # Fillet3
    # the kernel refuses this fillet: 3 mm, written as the material it takes off along each edge
    with BuildSketch(Plane(origin=(-60, 6.227929353, 1), x_dir=(0, -1, 0), z_dir=(0, 0, 1))) as fillet3_piece_1:
        with BuildLine():
            CenterArc((3.630132521, -3), FILLET3_R, 90, 38.275653288)
            Line((1.77179602, -0.644881012), (0, 0))
            Line((0, 0), (3.630132521, 0))
        make_face()
    extrude(amount=15.075331304, mode=Mode.SUBTRACT)
    with BuildSketch(Plane(origin=(-100, 4.125, -5.230049704), x_dir=(0, -1, 0), z_dir=(0, 0, 1))) as fillet3_piece_2:
        with BuildLine():
            CenterArc((2.492019882, 3), FILLET3_R, 211.240510341, 58.759489659)
            Line((-0.072973462, 1.444105033), (-0.329472796, 1.288515537))
            ThreePointArc((-0.329472796, 1.288515537), (-0.3, 1.183099735), (-0.3, 0))
            Line((-0.3, 0), (0, -0.3))
            Line((0, -0.3), (2.492019882, -0.3))
            Line((2.492019882, -0.3), (2.492019882, 0))
        make_face()
    extrude(amount=18.460099408, mode=Mode.SUBTRACT)

    # Sketch16 → Cut-Extrude12 (cut, two sides: drawn at the far end of the back side and taken through both)
    with BuildSketch(Plane.ZY.offset(100).offset(-CUT_EXTRUDE12_DEPTH_BACK)):
        Polygon((6.6, 7.5), (7, 7.1), (7, 7.5), align=None)
    extrude(amount=CUT_EXTRUDE12_DEPTH + CUT_EXTRUDE12_DEPTH_BACK, mode=Mode.SUBTRACT)


solid = part.part
